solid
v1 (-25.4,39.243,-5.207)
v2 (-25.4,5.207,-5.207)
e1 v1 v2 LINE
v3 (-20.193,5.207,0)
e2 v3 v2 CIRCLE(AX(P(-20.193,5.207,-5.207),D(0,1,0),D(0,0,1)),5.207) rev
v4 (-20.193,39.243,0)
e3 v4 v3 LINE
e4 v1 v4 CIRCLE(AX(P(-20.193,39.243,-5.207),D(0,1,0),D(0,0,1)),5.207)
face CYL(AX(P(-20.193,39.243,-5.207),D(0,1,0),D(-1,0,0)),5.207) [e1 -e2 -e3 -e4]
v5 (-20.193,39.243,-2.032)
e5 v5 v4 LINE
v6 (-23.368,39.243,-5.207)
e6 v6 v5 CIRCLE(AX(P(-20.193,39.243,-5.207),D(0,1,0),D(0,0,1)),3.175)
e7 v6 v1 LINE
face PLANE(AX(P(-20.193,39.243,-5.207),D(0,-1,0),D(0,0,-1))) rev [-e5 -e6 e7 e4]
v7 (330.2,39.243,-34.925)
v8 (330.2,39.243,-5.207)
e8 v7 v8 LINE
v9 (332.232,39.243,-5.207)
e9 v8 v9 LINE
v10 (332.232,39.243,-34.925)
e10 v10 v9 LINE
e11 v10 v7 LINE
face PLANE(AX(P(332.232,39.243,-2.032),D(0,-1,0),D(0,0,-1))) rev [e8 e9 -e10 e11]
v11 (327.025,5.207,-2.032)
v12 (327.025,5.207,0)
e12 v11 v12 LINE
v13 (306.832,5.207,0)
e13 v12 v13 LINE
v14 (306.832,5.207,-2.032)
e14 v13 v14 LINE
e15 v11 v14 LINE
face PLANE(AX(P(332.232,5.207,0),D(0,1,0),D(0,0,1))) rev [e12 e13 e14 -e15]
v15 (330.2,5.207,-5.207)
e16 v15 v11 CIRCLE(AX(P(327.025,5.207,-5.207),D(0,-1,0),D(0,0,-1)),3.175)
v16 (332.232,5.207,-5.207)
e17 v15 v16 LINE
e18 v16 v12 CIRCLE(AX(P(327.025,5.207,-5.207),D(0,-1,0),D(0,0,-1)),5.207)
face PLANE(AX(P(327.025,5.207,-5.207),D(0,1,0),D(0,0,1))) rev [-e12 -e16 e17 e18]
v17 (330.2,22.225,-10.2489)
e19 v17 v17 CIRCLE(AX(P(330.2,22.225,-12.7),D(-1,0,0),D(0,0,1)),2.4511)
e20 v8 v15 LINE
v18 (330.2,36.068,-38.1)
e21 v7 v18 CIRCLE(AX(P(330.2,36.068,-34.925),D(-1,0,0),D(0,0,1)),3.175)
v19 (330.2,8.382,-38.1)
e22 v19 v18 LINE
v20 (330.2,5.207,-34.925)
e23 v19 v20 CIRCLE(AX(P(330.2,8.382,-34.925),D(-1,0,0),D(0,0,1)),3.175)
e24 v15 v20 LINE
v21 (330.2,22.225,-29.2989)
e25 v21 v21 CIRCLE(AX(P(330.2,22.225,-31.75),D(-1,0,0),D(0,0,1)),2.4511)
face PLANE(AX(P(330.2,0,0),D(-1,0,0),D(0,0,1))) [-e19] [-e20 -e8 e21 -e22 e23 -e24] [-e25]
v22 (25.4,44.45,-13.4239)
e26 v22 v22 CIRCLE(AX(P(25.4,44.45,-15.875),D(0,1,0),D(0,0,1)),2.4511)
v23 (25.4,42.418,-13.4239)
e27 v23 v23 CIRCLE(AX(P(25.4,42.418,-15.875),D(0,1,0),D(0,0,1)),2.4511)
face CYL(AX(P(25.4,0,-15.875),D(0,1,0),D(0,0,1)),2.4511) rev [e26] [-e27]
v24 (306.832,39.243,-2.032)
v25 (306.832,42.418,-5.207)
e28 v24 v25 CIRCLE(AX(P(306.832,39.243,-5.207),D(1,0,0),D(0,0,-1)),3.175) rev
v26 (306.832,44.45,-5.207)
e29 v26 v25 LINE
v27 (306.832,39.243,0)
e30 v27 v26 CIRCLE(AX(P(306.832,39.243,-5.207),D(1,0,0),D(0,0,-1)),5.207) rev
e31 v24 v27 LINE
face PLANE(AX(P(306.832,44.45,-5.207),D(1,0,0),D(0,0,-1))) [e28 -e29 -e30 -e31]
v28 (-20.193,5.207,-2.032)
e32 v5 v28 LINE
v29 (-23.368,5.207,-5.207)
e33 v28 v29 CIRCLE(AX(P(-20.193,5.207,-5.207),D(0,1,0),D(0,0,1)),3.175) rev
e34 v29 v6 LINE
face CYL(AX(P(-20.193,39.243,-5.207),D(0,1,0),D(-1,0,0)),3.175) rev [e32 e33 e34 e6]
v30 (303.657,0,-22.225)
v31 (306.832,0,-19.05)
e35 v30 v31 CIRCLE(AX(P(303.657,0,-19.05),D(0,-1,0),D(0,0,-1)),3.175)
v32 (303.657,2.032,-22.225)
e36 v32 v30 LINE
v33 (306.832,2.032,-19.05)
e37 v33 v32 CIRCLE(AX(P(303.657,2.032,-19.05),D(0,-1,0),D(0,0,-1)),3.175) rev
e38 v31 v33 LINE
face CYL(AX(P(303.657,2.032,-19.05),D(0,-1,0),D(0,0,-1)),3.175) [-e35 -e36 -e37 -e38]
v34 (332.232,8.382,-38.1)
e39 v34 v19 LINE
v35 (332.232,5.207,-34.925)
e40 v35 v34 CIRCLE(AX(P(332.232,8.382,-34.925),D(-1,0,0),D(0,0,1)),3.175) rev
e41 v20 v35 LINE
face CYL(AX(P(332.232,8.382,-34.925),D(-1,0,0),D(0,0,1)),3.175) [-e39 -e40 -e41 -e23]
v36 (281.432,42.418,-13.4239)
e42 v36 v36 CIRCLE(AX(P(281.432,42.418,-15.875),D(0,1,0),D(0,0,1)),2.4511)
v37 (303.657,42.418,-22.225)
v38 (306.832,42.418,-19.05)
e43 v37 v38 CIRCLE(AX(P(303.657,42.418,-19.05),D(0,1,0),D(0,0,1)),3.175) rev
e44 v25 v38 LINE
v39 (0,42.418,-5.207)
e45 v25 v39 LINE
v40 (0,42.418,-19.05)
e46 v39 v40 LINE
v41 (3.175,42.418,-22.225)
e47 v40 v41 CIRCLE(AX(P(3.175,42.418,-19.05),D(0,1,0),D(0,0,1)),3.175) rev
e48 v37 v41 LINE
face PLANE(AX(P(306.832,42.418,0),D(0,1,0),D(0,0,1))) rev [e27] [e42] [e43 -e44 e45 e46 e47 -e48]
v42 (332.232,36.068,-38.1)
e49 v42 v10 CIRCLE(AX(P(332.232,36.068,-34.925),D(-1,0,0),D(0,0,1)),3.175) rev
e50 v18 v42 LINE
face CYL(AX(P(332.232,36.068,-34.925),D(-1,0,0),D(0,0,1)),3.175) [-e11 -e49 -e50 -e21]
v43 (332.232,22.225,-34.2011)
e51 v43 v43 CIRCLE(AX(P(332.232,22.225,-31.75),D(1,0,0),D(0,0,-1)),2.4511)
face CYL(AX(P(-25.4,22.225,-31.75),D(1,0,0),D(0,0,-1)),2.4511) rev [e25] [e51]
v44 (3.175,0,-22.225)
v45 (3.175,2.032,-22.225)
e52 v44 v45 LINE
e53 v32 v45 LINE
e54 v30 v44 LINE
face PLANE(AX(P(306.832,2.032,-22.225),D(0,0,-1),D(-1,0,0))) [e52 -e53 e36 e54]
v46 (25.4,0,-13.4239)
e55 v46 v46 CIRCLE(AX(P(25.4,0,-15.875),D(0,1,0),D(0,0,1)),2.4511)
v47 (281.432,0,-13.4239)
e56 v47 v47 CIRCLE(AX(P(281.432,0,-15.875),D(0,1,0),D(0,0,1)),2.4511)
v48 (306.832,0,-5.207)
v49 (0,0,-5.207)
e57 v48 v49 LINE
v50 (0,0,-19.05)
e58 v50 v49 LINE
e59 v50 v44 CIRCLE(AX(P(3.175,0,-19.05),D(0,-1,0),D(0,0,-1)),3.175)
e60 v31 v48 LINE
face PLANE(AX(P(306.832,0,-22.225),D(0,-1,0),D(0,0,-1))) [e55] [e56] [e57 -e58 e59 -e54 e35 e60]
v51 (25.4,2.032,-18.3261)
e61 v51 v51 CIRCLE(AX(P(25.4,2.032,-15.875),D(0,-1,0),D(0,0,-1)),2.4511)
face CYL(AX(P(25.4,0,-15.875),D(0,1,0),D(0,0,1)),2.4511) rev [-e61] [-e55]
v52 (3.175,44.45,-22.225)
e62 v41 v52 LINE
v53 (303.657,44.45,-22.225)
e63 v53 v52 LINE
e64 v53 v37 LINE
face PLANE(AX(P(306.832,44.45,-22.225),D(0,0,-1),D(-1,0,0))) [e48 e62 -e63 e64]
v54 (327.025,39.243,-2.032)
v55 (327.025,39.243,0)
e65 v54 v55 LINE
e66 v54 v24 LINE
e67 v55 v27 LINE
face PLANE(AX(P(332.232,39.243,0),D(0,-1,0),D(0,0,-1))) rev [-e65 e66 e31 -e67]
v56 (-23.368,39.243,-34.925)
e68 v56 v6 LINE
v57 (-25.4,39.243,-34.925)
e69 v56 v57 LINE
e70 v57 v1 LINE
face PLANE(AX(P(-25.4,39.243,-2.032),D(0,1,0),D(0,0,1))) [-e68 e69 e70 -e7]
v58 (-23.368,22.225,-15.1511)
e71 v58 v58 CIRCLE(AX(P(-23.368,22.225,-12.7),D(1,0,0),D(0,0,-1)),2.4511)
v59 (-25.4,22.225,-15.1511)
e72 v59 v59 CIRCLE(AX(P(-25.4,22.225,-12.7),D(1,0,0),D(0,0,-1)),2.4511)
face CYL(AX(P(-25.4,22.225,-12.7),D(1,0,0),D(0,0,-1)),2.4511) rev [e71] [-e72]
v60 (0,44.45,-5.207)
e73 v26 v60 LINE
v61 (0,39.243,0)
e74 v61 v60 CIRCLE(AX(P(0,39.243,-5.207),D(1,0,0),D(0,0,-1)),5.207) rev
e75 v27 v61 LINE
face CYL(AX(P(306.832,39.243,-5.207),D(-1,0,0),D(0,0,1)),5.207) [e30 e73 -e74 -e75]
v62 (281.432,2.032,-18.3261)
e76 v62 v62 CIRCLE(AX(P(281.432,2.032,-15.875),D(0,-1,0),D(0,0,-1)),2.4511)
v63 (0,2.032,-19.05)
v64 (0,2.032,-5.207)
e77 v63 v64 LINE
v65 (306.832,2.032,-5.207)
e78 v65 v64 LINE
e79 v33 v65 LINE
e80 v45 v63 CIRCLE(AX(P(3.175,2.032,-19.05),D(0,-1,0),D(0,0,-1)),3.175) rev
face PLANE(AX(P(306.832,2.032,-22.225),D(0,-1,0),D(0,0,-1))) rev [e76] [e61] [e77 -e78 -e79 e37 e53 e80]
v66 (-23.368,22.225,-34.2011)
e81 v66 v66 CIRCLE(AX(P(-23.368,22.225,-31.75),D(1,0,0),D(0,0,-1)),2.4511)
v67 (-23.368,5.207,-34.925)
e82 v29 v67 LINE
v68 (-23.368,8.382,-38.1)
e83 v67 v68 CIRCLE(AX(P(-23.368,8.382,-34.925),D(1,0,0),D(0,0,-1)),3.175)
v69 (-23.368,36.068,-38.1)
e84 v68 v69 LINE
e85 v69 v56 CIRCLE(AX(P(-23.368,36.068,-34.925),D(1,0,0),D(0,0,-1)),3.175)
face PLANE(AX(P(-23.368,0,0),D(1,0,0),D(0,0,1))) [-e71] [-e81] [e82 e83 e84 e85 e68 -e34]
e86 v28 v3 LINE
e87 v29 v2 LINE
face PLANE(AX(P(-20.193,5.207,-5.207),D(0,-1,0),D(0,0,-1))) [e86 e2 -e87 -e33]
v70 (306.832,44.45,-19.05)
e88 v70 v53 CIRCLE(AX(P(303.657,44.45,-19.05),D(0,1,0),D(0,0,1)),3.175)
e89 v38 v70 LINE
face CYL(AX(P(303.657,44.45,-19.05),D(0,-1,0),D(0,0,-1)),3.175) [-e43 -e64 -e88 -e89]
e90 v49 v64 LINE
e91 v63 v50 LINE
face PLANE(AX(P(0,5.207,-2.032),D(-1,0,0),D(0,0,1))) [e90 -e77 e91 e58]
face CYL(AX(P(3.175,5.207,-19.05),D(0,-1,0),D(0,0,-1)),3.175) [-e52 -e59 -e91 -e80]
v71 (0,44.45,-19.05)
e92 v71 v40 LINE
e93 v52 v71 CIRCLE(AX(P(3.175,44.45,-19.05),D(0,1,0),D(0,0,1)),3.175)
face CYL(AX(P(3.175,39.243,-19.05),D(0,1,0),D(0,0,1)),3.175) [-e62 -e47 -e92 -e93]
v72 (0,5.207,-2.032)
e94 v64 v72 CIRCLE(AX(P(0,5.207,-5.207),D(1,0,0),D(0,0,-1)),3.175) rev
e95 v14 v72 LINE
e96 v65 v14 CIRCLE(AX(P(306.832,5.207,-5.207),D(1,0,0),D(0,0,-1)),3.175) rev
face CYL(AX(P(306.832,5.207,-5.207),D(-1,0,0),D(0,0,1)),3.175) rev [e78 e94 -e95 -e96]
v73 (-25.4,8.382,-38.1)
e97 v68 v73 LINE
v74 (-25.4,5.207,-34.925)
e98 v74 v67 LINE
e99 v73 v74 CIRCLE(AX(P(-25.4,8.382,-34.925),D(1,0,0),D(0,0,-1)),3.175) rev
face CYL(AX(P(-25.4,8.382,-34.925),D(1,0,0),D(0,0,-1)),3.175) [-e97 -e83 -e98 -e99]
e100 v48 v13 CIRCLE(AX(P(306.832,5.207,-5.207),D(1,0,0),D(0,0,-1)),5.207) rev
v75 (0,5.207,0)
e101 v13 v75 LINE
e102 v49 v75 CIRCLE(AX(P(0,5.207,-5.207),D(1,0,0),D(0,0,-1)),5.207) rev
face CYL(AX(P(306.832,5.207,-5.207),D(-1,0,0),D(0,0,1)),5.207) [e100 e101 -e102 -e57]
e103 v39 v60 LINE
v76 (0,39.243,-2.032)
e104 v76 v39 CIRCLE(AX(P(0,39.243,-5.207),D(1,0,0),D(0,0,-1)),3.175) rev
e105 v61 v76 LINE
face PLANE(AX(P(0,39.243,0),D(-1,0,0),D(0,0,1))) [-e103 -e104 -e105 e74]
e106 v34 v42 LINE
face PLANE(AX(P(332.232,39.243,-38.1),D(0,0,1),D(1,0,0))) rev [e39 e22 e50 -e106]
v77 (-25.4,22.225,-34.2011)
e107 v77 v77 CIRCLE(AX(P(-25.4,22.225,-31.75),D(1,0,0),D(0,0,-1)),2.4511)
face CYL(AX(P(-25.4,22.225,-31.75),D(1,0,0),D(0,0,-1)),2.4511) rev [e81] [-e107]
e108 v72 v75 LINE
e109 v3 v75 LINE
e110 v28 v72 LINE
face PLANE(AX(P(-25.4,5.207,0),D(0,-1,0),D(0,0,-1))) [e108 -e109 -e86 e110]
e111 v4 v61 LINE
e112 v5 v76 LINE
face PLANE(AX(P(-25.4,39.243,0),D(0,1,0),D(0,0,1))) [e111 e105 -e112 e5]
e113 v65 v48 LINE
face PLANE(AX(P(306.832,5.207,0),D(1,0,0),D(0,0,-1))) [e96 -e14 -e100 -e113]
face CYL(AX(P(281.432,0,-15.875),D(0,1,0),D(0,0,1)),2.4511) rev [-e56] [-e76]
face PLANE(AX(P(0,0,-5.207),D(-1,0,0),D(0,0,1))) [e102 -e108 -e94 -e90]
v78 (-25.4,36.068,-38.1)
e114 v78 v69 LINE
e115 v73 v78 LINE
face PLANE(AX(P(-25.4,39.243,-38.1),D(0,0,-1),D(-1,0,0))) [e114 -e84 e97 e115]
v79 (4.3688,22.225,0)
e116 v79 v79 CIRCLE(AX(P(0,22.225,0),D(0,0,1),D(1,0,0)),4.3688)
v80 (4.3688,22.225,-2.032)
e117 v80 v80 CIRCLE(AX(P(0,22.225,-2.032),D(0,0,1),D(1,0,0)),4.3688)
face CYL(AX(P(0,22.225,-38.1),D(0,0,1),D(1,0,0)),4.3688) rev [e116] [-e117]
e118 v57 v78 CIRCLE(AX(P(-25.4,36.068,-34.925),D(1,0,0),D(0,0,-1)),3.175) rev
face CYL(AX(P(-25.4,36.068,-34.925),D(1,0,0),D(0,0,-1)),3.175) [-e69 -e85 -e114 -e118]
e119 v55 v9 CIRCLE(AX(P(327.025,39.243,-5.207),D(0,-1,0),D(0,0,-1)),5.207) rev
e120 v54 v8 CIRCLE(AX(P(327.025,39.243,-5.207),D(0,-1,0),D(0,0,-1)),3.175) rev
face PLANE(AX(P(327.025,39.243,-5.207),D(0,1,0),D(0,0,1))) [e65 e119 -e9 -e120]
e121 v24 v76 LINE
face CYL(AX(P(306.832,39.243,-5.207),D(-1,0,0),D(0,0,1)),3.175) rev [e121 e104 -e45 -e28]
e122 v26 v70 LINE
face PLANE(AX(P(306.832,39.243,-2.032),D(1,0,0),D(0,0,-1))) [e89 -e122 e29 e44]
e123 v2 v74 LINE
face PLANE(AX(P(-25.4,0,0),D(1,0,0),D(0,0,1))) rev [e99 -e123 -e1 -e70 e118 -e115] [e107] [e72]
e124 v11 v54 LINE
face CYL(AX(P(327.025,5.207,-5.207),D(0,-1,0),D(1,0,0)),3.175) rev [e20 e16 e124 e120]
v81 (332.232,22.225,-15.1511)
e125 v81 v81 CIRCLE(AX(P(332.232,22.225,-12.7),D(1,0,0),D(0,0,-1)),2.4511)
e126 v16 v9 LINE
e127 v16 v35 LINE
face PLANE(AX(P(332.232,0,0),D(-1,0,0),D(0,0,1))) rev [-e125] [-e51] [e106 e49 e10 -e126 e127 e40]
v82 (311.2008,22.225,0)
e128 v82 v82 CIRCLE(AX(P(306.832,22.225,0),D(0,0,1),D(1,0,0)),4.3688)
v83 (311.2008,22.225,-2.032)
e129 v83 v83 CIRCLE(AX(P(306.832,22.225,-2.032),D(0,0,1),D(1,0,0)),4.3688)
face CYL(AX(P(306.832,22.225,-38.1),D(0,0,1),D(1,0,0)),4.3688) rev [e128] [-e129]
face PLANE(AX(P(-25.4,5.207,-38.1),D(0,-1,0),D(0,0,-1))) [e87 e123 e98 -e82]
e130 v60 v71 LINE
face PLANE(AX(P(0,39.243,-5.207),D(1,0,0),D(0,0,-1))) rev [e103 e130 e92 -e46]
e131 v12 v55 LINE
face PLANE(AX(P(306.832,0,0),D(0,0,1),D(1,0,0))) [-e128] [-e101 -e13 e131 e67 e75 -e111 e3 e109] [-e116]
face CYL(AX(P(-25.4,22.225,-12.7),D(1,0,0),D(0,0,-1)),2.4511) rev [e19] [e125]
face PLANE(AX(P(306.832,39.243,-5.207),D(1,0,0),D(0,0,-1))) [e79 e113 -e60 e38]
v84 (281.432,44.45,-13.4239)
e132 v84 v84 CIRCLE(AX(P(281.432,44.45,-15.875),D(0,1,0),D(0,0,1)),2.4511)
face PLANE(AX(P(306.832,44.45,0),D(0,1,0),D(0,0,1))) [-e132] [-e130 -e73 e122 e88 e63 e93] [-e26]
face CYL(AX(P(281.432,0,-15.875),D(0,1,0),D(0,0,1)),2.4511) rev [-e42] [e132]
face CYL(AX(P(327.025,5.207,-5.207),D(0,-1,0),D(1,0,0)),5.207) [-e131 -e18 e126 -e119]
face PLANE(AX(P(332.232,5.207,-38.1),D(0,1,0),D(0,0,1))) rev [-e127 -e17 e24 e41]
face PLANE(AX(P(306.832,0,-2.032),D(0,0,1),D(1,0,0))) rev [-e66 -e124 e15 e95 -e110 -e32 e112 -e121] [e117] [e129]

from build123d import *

# Parameters (mm, degrees)
BASE_FLANGE1_DEPTH           = 306.832
SKETCH2_W                    = 2.032
SKETCH2_H                    = 34.036
BOSS_EXTRUDE1_DEPTH          = 25.4
EDGE_FLANGE1_STRIP_W         = 14.478
EDGE_FLANGE1_STRIP_H         = 2.032
EDGE_FLANGE1_STRIP_CUT_DEPTH = 34.036
EDGE_FLANGE1_DEPTH           = 34.036
SKETCH6_R                    = 2.4511
CUT_EXTRUDE1_DEPTH           = 338.350728951
SKETCH7_R                    = 4.3688
CUT_EXTRUDE2_DEPTH           = 338.350728951
SKETCH8_R                    = 2.4511
CUT_EXTRUDE3_DEPTH           = 363.392135571
FILLET1_R                    = 3.175


# Sheet-metal steps are written as plain solids
with BuildPart() as part:
    # Sketch1 → Base-Flange1 (new body)
    with BuildSketch(Plane(origin=(0, 0, 0), x_dir=(0, 0, -1), z_dir=(1, 0, 0))):
        with BuildLine():
            Line((22.225, 0), (5.207, 0))
            ThreePointArc((5.207, 0), (1.52509499, 1.52509499), (0, 5.207))
            Line((0, 5.207), (0, 39.243))
            ThreePointArc((0, 39.243), (1.52509499, 42.92490501), (5.207, 44.45))
            Line((5.207, 44.45), (22.225, 44.45))
            Line((22.225, 44.45), (22.225, 42.418))
            Line((22.225, 42.418), (5.207, 42.418))
            ThreePointArc((5.207, 42.418), (2.96193597, 41.48806403), (2.032, 39.243))
            Line((2.032, 39.243), (2.032, 5.207))
            ThreePointArc((2.032, 5.207), (2.96193597, 2.96193597), (5.207, 2.032))
            Line((5.207, 2.032), (22.225, 2.032))
            Line((22.225, 2.032), (22.225, 0))
        make_face()
    extrude(amount=BASE_FLANGE1_DEPTH)

    # Sketch2 → Boss-Extrude1 (add)
    with BuildSketch(Plane(origin=(306.832, 0, 0), x_dir=(0, 0, -1), z_dir=(1, 0, 0))):
        with Locations((1.016, 22.225)):
            Rectangle(SKETCH2_W, SKETCH2_H)
    boss_extrude1 = extrude(amount=BOSS_EXTRUDE1_DEPTH)

    # Edge-Flange1 strip (across the edge) → Edge-Flange1 strip cut (cut)
    with BuildSketch(Plane(origin=(332.232, 39.243, -2.032), x_dir=(-1, 0, 0), z_dir=(0, -1, 0))):
        with Locations((-2.032, -1.016)):
            Rectangle(EDGE_FLANGE1_STRIP_W, EDGE_FLANGE1_STRIP_H)
    edge_flange1_strip_cut = extrude(amount=EDGE_FLANGE1_STRIP_CUT_DEPTH, mode=Mode.SUBTRACT)

    # Edge-Flange1 section (across the edge) → Edge-Flange1 (add)
    with BuildSketch(Plane(origin=(332.232, 39.243, -2.032), x_dir=(-1, 0, 0), z_dir=(0, -1, 0))):
        with BuildLine():
            Line((0, 3.175), (0, 36.068))
            Line((0, 36.068), (2.032, 36.068))
            Line((2.032, 36.068), (2.032, 3.175))
            ThreePointArc((2.032, 3.175), (2.96193597, 0.92993597), (5.207, 0))
            Line((5.207, 0), (5.207, -2.032))
            ThreePointArc((5.207, -2.032), (1.52509499, -0.50690501), (0, 3.175))
        make_face()
    edge_flange1 = extrude(amount=EDGE_FLANGE1_DEPTH)

    # Mirror1: Boss-Extrude1, Edge-Flange1 strip cut, Edge-Flange1 across plane
    add(boss_extrude1.mirror(Plane.ZY.offset(-153.416)))
    add(edge_flange1_strip_cut.mirror(Plane.ZY.offset(-153.416)), mode=Mode.SUBTRACT)
    add(edge_flange1.mirror(Plane.ZY.offset(-153.416)))

    # Sketch6 → Cut-Extrude1 (cut, through all)
    with BuildSketch(Plane(origin=(0, 44.45, 0), x_dir=(1, 0, 0), z_dir=(0, 1, 0))):
        with Locations(Location((25.4, 15.875, 0), (0, 0, 270))):
            Circle(SKETCH6_R)
        with Locations(Location((281.432, 15.875, 0), (0, 0, 270))):
            Circle(SKETCH6_R)
    extrude(amount=-CUT_EXTRUDE1_DEPTH, mode=Mode.SUBTRACT)

    # Sketch7 → Cut-Extrude2 (cut, through all)
    with BuildSketch(Plane.XY):
        with Locations((0, 22.225)):
            Circle(SKETCH7_R)
        with Locations((306.832, 22.225)):
            Circle(SKETCH7_R)
    extrude(amount=-CUT_EXTRUDE2_DEPTH, mode=Mode.SUBTRACT)

    # Sketch8 → Cut-Extrude3 (cut, through all)
    with BuildSketch(Plane(origin=(332.232, 0, 0), x_dir=(0, 0, -1), z_dir=(1, 0, 0))):
        with Locations((31.75, 22.225)):
            Circle(SKETCH8_R)
        with Locations((12.7, 22.225)):
            Circle(SKETCH8_R)
    extrude(amount=-CUT_EXTRUDE3_DEPTH, mode=Mode.SUBTRACT)

    # Fillet1
    fillet1_edges = [part.edges().sort_by_distance(p)[0] for p in [
        (-24.384, 5.207, -38.1),
        (0, 1.016, -22.225),
        (-24.384, 39.243, -38.1),
        (0, 43.434, -22.225),
        (306.832, 1.016, -22.225),
        (331.216, 39.243, -38.1),
        (331.216, 5.207, -38.1),
        (306.832, 43.434, -22.225),
    ]]
    fillet(fillet1_edges, radius=FILLET1_R)


solid = part.part
